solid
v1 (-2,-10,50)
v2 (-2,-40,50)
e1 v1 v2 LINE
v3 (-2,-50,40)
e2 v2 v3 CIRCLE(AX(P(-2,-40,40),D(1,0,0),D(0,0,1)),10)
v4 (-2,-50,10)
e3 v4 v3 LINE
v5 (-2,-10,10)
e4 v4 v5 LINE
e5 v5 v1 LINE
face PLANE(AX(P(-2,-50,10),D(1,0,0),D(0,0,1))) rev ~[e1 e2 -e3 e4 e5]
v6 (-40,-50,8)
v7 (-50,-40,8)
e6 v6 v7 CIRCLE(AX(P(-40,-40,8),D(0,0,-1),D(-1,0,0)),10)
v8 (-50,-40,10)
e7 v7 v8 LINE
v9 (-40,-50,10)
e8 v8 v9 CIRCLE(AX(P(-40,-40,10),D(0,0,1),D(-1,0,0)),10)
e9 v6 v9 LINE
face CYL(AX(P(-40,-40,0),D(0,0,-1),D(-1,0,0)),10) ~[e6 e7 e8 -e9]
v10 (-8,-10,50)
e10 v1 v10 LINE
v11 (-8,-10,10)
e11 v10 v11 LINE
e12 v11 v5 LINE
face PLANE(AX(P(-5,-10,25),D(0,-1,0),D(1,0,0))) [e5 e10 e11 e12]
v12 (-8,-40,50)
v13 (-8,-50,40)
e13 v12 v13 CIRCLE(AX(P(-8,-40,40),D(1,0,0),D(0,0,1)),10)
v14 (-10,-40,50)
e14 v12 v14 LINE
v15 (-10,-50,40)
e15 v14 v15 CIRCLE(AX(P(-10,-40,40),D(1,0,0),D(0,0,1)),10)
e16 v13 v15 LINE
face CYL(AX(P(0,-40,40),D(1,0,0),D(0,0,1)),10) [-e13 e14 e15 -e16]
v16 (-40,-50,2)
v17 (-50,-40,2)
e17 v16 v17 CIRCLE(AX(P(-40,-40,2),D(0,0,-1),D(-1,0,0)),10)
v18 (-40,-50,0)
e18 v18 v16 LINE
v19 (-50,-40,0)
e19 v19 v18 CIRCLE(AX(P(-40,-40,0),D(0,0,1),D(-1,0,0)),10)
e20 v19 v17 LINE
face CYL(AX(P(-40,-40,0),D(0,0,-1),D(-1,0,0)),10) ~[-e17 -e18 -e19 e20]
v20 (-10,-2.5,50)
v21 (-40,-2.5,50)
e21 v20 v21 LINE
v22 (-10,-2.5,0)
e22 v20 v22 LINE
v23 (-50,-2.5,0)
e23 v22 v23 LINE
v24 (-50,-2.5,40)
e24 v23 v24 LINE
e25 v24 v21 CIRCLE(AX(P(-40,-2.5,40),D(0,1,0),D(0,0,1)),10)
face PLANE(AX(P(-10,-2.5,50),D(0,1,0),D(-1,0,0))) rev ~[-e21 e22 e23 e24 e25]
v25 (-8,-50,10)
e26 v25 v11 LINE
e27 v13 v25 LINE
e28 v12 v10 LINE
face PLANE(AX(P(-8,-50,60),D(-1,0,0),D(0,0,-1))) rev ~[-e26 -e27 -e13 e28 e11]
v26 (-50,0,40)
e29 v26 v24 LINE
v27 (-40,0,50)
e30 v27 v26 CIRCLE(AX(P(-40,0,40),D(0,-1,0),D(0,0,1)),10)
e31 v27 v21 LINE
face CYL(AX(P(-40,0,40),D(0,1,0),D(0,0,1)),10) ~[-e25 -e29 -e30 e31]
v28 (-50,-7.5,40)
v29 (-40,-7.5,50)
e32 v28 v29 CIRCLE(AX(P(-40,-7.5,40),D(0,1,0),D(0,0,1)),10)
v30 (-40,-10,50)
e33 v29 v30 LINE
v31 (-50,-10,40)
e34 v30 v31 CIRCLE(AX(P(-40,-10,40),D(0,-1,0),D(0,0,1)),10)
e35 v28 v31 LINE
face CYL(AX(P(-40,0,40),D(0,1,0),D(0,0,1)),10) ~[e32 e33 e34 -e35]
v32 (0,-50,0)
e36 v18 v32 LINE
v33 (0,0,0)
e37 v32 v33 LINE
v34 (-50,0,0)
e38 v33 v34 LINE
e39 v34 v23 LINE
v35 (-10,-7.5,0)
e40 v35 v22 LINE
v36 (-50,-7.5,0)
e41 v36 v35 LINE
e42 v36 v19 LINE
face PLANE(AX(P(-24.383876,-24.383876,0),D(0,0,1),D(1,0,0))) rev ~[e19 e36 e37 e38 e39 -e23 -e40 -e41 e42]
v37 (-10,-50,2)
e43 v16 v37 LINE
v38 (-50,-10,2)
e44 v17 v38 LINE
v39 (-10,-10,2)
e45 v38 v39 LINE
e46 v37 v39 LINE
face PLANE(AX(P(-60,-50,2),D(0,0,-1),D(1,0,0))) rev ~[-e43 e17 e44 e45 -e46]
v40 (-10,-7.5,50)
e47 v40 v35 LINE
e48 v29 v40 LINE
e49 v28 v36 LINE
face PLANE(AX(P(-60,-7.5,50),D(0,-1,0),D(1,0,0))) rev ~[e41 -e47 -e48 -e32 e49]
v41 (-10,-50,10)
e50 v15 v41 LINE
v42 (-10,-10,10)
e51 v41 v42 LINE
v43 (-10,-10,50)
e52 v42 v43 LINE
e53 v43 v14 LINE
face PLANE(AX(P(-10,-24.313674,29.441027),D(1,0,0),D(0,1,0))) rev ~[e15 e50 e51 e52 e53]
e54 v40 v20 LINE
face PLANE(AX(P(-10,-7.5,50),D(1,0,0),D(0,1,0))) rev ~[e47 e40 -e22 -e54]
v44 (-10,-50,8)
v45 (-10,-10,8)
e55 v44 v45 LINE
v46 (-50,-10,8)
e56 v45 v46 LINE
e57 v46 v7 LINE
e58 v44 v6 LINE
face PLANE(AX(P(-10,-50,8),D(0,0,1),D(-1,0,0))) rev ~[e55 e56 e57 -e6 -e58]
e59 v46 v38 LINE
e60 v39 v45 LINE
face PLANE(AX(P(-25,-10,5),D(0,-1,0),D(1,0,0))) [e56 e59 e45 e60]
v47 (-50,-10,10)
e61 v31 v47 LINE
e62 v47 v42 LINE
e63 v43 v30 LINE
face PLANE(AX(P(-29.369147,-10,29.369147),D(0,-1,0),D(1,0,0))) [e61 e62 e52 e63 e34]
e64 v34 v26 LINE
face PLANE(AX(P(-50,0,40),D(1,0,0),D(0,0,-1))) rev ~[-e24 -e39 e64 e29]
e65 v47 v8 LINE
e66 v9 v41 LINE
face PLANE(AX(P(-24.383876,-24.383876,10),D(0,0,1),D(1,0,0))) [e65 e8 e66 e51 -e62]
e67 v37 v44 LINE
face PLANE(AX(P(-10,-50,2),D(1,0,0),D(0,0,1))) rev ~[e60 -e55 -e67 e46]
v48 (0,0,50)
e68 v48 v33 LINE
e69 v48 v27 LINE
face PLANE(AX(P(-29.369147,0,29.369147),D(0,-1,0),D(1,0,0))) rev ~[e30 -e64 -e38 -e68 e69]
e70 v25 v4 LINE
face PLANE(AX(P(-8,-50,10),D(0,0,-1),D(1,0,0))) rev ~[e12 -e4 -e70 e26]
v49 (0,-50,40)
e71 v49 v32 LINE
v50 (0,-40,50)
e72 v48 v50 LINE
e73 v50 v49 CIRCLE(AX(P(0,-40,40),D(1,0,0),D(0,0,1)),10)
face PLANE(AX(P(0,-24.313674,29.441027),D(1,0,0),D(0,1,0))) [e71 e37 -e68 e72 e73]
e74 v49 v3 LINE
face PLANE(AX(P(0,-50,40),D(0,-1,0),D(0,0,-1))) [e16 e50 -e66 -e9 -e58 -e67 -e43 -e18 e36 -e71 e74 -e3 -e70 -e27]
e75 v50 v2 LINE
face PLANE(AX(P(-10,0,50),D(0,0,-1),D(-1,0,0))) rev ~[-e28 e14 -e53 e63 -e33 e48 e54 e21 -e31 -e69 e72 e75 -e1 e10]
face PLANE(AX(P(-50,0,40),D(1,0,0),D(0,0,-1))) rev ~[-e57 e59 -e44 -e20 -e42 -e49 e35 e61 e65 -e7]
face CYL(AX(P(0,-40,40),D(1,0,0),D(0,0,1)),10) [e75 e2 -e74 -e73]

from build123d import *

# Parameters (mm, degrees)
F1_DEPTH = 10
F3_DEPTH = 10
F5_DEPTH = 10
F6_W     = 20
F6_H     = 6
F6_W_2   = 6
F6_H_2   = 30
F6_H_3   = 20
F7_DEPTH = 40
F8_W     = 30
F8_H     = 5
F8_W_2   = 20
F9_DEPTH = 50.001


# Not quite as in the source:
# - a feature names something its author has since deleted; it is built from what else it names


with BuildPart() as f1:
    # F0 (on Top) → F1 (new body)
    with BuildSketch(Plane.XY):
        with BuildLine():
            Line((0, -50), (0, 0))
            Line((0, 0), (-50, 0))
            Line((-50, 0), (-50, -40))
            ThreePointArc((-50, -40), (-47.0710678119, -47.0710678119), (-40, -50))
            Line((-40, -50), (0, -50))
        make_face()
    extrude(amount=F1_DEPTH)

    # F2 (on Right) → F3 (join)
    with BuildSketch(Plane.YZ):
        with BuildLine():
            Line((-50, 10), (0, 10))
            Line((0, 10), (0, 50))
            Line((0, 50), (-40, 50))
            ThreePointArc((-40, 50), (-47.0710678119, 47.0710678119), (-50, 40))
            Line((-50, 40), (-50, 10))
        make_face()
    extrude(amount=-F3_DEPTH)

    # F4 (on Front) → F5 (join)
    with BuildSketch(Plane.XZ):
        with BuildLine():
            Line((-50, 10), (-10, 10))
            Line((-10, 10), (-10, 50))
            Line((-10, 50), (-40, 50))
            ThreePointArc((-40, 50), (-47.0710678119, 47.0710678119), (-50, 40))
            Line((-50, 40), (-50, 10))
        make_face()
    extrude(amount=F5_DEPTH)

    # F6 (on face) → F7 (cut)
    with BuildSketch(Plane.XZ.offset(50)):
        Polygon((-15, 2), (-10, 2), (-10, 8), (-40, 8), (-40, 2), align=None)
        with Locations((-50, 5)):
            Rectangle(F6_W, F6_H)
        with Locations((-5, 25)):
            Rectangle(F6_W_2, F6_H_2)
        with Locations((-5, 50)):
            Rectangle(F6_W_2, F6_H_3)
    extrude(amount=-F7_DEPTH, mode=Mode.SUBTRACT)

    # F8 (on face) → F9 (cut, through all)
    with BuildSketch(Plane.XY.offset(50)):
        with Locations((-25, -5)):
            Rectangle(F8_W, F8_H)
        with Locations((-50, -5)):
            Rectangle(F8_W_2, F8_H)
    extrude(amount=-F9_DEPTH, mode=Mode.SUBTRACT)


solid = f1.part
